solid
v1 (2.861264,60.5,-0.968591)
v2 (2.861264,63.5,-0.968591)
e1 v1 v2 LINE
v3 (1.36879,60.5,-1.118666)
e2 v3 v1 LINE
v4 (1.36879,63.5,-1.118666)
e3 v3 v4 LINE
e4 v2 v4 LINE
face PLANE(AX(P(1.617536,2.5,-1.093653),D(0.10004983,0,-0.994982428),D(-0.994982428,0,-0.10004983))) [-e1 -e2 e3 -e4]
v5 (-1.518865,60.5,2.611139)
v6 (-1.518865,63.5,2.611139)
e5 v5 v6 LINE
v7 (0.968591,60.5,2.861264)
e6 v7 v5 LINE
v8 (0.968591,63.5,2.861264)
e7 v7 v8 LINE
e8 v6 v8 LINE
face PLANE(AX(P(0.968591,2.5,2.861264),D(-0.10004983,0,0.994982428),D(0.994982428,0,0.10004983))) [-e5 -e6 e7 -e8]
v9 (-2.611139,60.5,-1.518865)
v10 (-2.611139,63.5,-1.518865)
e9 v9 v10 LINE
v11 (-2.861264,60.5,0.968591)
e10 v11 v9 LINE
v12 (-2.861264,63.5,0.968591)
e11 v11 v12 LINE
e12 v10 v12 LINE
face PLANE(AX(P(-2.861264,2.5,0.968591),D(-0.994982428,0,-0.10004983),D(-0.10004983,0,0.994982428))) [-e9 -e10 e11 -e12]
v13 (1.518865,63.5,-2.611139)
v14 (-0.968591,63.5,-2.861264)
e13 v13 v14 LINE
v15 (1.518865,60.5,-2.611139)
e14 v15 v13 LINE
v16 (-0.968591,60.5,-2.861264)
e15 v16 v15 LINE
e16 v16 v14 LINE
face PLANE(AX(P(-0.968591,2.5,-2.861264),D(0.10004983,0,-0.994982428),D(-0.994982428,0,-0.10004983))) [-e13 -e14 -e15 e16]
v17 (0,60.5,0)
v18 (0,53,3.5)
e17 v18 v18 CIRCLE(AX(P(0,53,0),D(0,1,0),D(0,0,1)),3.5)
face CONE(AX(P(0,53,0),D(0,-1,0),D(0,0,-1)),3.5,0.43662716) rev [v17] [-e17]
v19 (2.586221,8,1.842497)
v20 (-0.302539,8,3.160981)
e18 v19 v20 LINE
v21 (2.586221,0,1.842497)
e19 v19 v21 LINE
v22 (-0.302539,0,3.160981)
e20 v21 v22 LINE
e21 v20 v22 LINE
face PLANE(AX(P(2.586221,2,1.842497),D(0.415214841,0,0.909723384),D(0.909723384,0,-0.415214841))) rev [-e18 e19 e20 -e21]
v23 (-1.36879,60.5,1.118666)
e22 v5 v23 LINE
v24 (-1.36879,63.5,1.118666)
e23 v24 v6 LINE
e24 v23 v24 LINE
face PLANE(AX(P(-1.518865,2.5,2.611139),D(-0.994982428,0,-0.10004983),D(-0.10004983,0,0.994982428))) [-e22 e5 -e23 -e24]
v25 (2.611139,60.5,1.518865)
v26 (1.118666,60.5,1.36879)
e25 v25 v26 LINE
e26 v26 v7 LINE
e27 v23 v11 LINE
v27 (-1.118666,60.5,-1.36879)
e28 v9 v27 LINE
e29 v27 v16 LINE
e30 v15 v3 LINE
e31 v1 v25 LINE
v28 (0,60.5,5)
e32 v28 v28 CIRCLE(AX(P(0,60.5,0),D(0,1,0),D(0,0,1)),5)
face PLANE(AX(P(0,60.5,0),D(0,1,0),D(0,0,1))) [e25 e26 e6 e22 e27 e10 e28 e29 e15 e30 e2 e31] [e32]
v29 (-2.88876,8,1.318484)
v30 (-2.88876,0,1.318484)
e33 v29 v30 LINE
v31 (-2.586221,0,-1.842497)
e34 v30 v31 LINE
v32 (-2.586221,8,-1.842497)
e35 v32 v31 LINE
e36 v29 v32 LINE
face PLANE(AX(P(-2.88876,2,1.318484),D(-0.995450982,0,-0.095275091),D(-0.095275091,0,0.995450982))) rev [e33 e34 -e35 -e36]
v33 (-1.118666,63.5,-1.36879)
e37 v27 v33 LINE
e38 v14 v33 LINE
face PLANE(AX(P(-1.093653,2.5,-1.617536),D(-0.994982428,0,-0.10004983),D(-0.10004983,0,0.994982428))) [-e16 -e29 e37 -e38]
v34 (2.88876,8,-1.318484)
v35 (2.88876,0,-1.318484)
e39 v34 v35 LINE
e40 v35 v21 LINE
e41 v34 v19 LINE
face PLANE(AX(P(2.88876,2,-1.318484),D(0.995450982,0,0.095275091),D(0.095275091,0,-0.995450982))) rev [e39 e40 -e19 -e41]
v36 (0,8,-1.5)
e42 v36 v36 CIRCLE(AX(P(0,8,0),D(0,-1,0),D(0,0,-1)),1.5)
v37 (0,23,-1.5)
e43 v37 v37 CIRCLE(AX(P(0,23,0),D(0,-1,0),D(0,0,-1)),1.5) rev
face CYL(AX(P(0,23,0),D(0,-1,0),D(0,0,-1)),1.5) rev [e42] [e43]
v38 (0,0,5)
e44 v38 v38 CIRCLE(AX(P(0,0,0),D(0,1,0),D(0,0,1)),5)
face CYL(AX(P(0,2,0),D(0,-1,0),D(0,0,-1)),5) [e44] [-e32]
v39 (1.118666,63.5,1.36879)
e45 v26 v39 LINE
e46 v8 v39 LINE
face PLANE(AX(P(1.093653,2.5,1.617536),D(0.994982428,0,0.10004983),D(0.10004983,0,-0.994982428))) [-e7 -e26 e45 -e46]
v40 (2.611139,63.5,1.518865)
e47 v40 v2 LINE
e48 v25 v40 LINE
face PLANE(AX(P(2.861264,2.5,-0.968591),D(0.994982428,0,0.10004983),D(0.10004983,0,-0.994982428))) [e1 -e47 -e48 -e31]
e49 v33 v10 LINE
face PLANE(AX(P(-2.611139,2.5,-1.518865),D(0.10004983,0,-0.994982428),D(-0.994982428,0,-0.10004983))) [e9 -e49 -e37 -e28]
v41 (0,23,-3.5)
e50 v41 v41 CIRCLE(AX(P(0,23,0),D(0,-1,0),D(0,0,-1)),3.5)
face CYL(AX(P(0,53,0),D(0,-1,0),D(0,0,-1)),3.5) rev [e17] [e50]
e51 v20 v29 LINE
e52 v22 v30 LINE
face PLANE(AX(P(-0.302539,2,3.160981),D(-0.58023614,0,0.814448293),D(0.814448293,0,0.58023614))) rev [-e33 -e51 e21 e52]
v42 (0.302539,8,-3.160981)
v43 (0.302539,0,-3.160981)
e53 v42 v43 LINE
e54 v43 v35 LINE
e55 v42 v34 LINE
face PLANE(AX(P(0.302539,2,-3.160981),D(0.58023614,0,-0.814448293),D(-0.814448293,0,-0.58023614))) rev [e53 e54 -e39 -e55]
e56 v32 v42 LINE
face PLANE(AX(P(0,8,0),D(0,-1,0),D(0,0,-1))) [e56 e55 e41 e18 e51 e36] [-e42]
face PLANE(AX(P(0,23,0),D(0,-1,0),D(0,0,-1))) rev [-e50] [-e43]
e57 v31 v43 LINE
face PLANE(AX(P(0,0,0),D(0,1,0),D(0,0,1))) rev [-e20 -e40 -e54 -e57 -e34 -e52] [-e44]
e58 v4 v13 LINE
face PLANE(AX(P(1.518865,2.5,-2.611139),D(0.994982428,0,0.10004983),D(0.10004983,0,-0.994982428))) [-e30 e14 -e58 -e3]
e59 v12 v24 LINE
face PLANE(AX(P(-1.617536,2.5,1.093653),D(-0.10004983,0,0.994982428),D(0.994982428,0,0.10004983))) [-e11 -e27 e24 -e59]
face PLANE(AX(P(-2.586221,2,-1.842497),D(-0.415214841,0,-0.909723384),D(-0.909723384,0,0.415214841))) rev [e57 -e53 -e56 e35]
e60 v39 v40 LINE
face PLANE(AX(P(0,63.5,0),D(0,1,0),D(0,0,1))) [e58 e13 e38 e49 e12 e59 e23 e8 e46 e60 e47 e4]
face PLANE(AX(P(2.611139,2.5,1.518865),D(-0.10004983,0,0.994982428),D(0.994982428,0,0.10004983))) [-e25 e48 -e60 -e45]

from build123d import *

# Parameters (mm, degrees)
SKETCH_1_R          = 5
EXTRUDE_1_DEPTH     = 2
EXTRUDE_2_DEPTH     = 3.5
EXTRUDE_3_DEPTH     = 3.5
SKETCH_4_R          = 5
EXTRUDE_4_DEPTH     = 0.5
CUT_EXTRUDE_2_DEPTH = 3
CUT_EXTRUDE_3_DEPTH = 2
EXTRUDE_5_DEPTH     = 58
SKETCH_8_R          = 5
EXTRUDE_6_DEPTH     = 58
CUT_EXTRUDE_4_DEPTH = 8
SKETCH_10_R         = 1.5
CUT_EXTRUDE_5_DEPTH = 15
SKETCH_11_R         = 3.5
CUT_EXTRUDE_6_DEPTH = 30
SKETCH_12_R         = 1
CUT_EXTRUDE_7_DEPTH = 7
SKETCH_13_R         = 3.5
SKETCH_14_R         = 1


# Read off the part's stored shape, not the designer's step: 切除-扫描1
with BuildPart() as part:
    # 草图1 → 凸台-拉伸1 (new body)
    with BuildSketch(Plane(origin=(0, 0, 0), x_dir=(1, 0, 0), z_dir=(0, 1, 0))):
        with Locations(Location((0, 0, 0), (0, 0, 270))):
            Circle(SKETCH_1_R)
        Polygon((2.55392077, -1.838021228), (2.868733461, 1.292749652), (0.314812691, 3.13077088), (-2.55392077, 1.838021228), (-2.868733461, -1.292749652), (-0.314812691, -3.13077088), align=None, mode=Mode.SUBTRACT)
    extrude(amount=EXTRUDE_1_DEPTH)

    # 草图2 → 凸台-拉伸2 (add)
    with BuildSketch(Plane(origin=(0, 2, 0), x_dir=(1, 0, 0), z_dir=(0, 1, 0))):
        Polygon((-2.834872538, 1.792623133), (3.135022029, 1.192324151), (2.834872538, -1.792623133), (-3.135022029, -1.192324151), align=None)
    extrude(amount=EXTRUDE_2_DEPTH)

    # 草图3 → 凸台-拉伸3 (add)
    with BuildSketch(Plane(origin=(0, 2, 0), x_dir=(1, 0, 0), z_dir=(0, 1, 0))):
        Polygon((-1.192324151, 3.135022029), (-1.792623133, -2.834872538), (1.192324151, -3.135022029), (1.792623133, 2.834872538), align=None)
    extrude(amount=EXTRUDE_3_DEPTH)

    # 草图4 → 凸台-拉伸4 (add)
    with BuildSketch(Plane(origin=(0, 2, 0), x_dir=(1, 0, 0), z_dir=(0, 1, 0))):
        with Locations(Location((0, 0, 0), (0, 0, 270))):
            Circle(SKETCH_4_R)
    extrude(amount=EXTRUDE_4_DEPTH)

    # 草图5 → 切除-拉伸2 (cut)
    with BuildSketch(Plane(origin=(0, 5.5, 0), x_dir=(1, 0, 0), z_dir=(0, 1, 0))):
        Polygon((-3.135022029, -1.192324151), (-2.834872538, 1.792623133), (-1.342398896, 1.642548387), (-1.192324151, 3.135022029), (1.792623133, 2.834872538), (1.642548387, 1.342398896), (3.135022029, 1.192324151), (2.834872538, -1.792623133), (1.342398896, -1.642548387), (1.192324151, -3.135022029), (-1.792623133, -2.834872538), (-1.642548387, -1.342398896), align=None)
        Polygon((-1.093653289, 1.617535929), (-0.968591001, 2.861263964), (1.518865068, 2.611139388), (1.39380278, 1.367411354), (1.368790323, 1.118665747), (1.617535929, 1.093653289), (2.861263964, 0.968591001), (2.611139388, -1.518865068), (1.367411354, -1.39380278), (1.118665747, -1.368790323), (1.093653289, -1.617535929), (0.968591001, -2.861263964), (-1.518865068, -2.611139388), (-1.39380278, -1.367411354), (-1.368790323, -1.118665747), (-1.617535929, -1.093653289), (-2.861263964, -0.968591001), (-2.611139388, 1.518865068), (-1.367411354, 1.39380278), (-1.118665747, 1.368790323), align=None, mode=Mode.SUBTRACT)
    extrude(amount=-CUT_EXTRUDE_2_DEPTH, mode=Mode.SUBTRACT)

    # 草图6 → 切除-拉伸3 (cut)
    with BuildSketch(Plane.XZ):
        Polygon((2.888759724, -1.318484202), (2.586220675, 1.842497205), (-0.302539048, 3.160981407), (-2.888759724, 1.318484202), (-2.586220675, -1.842497205), (0.302539048, -3.160981407), align=None)
    extrude(amount=-CUT_EXTRUDE_3_DEPTH, mode=Mode.SUBTRACT)

    # 草图7 → 凸台-拉伸5 (add)
    with BuildSketch(Plane(origin=(0, 5.5, 0), x_dir=(1, 0, 0), z_dir=(0, 1, 0))):
        Polygon((-1.118665747, 1.368790323), (-0.968591001, 2.861263964), (1.518865068, 2.611139388), (1.368790323, 1.118665747), (2.861263964, 0.968591001), (2.611139388, -1.518865068), (1.118665747, -1.368790323), (0.968591001, -2.861263964), (-1.518865068, -2.611139388), (-1.368790323, -1.118665747), (-2.861263964, -0.968591001), (-2.611139388, 1.518865068), align=None)
    extrude(amount=EXTRUDE_5_DEPTH)

    # 草图8 → 凸台-拉伸6 (add)
    with BuildSketch(Plane(origin=(0, 2.5, 0), x_dir=(1, 0, 0), z_dir=(0, 1, 0))):
        with Locations(Location((0, 0, 0), (0, 0, 270))):
            Circle(SKETCH_8_R)
    extrude(amount=EXTRUDE_6_DEPTH)

    # 草图9 → 切除-拉伸4 (cut)
    with BuildSketch(Plane.XZ):
        Polygon((2.888759724, -1.318484202), (2.586220675, 1.842497205), (-0.302539048, 3.160981407), (-2.888759724, 1.318484202), (-2.586220675, -1.842497205), (0.302539048, -3.160981407), align=None)
    extrude(amount=-CUT_EXTRUDE_4_DEPTH, mode=Mode.SUBTRACT)

    # 草图10 → 切除-拉伸5 (cut)
    with BuildSketch(Plane.XZ.offset(-8)):
        with Locations(Location((0, 0, 0), (0, 0, 270))):
            Circle(SKETCH_10_R)
    extrude(amount=-CUT_EXTRUDE_5_DEPTH, mode=Mode.SUBTRACT)

    # 草图11 → 切除-拉伸6 (cut)
    with BuildSketch(Plane.XZ.offset(-23)):
        with Locations(Location((0, 0, 0), (0, 0, 270))):
            Circle(SKETCH_11_R)
    extrude(amount=-CUT_EXTRUDE_6_DEPTH, mode=Mode.SUBTRACT)

    # 草图12 → 切除-拉伸7 (cut)
    with BuildSketch(Plane.XZ.offset(-53)):
        with Locations(Location((0, 0, 0), (0, 0, 270))):
            Circle(SKETCH_12_R)
    extrude(amount=-CUT_EXTRUDE_7_DEPTH, mode=Mode.SUBTRACT)

    # 草图13 → 放样1 section 0
    with BuildSketch(Plane.XZ.offset(-53)):
        Circle(SKETCH_13_R)
    # 草图14 → 放样1 section 1
    with BuildSketch(Plane.XZ.offset(-60)):
        Circle(SKETCH_14_R)
    loft()

    # 切除-扫描1 outline → 切除-扫描1 (revolve, cut)
    with BuildSketch(Plane.XY):
        Polygon((3.5, 53), (0, 60.5), (0, 53), align=None)
    revolve(axis=Axis((0, 0, 0), (0, 1, 0)), mode=Mode.SUBTRACT)


solid = part.part
